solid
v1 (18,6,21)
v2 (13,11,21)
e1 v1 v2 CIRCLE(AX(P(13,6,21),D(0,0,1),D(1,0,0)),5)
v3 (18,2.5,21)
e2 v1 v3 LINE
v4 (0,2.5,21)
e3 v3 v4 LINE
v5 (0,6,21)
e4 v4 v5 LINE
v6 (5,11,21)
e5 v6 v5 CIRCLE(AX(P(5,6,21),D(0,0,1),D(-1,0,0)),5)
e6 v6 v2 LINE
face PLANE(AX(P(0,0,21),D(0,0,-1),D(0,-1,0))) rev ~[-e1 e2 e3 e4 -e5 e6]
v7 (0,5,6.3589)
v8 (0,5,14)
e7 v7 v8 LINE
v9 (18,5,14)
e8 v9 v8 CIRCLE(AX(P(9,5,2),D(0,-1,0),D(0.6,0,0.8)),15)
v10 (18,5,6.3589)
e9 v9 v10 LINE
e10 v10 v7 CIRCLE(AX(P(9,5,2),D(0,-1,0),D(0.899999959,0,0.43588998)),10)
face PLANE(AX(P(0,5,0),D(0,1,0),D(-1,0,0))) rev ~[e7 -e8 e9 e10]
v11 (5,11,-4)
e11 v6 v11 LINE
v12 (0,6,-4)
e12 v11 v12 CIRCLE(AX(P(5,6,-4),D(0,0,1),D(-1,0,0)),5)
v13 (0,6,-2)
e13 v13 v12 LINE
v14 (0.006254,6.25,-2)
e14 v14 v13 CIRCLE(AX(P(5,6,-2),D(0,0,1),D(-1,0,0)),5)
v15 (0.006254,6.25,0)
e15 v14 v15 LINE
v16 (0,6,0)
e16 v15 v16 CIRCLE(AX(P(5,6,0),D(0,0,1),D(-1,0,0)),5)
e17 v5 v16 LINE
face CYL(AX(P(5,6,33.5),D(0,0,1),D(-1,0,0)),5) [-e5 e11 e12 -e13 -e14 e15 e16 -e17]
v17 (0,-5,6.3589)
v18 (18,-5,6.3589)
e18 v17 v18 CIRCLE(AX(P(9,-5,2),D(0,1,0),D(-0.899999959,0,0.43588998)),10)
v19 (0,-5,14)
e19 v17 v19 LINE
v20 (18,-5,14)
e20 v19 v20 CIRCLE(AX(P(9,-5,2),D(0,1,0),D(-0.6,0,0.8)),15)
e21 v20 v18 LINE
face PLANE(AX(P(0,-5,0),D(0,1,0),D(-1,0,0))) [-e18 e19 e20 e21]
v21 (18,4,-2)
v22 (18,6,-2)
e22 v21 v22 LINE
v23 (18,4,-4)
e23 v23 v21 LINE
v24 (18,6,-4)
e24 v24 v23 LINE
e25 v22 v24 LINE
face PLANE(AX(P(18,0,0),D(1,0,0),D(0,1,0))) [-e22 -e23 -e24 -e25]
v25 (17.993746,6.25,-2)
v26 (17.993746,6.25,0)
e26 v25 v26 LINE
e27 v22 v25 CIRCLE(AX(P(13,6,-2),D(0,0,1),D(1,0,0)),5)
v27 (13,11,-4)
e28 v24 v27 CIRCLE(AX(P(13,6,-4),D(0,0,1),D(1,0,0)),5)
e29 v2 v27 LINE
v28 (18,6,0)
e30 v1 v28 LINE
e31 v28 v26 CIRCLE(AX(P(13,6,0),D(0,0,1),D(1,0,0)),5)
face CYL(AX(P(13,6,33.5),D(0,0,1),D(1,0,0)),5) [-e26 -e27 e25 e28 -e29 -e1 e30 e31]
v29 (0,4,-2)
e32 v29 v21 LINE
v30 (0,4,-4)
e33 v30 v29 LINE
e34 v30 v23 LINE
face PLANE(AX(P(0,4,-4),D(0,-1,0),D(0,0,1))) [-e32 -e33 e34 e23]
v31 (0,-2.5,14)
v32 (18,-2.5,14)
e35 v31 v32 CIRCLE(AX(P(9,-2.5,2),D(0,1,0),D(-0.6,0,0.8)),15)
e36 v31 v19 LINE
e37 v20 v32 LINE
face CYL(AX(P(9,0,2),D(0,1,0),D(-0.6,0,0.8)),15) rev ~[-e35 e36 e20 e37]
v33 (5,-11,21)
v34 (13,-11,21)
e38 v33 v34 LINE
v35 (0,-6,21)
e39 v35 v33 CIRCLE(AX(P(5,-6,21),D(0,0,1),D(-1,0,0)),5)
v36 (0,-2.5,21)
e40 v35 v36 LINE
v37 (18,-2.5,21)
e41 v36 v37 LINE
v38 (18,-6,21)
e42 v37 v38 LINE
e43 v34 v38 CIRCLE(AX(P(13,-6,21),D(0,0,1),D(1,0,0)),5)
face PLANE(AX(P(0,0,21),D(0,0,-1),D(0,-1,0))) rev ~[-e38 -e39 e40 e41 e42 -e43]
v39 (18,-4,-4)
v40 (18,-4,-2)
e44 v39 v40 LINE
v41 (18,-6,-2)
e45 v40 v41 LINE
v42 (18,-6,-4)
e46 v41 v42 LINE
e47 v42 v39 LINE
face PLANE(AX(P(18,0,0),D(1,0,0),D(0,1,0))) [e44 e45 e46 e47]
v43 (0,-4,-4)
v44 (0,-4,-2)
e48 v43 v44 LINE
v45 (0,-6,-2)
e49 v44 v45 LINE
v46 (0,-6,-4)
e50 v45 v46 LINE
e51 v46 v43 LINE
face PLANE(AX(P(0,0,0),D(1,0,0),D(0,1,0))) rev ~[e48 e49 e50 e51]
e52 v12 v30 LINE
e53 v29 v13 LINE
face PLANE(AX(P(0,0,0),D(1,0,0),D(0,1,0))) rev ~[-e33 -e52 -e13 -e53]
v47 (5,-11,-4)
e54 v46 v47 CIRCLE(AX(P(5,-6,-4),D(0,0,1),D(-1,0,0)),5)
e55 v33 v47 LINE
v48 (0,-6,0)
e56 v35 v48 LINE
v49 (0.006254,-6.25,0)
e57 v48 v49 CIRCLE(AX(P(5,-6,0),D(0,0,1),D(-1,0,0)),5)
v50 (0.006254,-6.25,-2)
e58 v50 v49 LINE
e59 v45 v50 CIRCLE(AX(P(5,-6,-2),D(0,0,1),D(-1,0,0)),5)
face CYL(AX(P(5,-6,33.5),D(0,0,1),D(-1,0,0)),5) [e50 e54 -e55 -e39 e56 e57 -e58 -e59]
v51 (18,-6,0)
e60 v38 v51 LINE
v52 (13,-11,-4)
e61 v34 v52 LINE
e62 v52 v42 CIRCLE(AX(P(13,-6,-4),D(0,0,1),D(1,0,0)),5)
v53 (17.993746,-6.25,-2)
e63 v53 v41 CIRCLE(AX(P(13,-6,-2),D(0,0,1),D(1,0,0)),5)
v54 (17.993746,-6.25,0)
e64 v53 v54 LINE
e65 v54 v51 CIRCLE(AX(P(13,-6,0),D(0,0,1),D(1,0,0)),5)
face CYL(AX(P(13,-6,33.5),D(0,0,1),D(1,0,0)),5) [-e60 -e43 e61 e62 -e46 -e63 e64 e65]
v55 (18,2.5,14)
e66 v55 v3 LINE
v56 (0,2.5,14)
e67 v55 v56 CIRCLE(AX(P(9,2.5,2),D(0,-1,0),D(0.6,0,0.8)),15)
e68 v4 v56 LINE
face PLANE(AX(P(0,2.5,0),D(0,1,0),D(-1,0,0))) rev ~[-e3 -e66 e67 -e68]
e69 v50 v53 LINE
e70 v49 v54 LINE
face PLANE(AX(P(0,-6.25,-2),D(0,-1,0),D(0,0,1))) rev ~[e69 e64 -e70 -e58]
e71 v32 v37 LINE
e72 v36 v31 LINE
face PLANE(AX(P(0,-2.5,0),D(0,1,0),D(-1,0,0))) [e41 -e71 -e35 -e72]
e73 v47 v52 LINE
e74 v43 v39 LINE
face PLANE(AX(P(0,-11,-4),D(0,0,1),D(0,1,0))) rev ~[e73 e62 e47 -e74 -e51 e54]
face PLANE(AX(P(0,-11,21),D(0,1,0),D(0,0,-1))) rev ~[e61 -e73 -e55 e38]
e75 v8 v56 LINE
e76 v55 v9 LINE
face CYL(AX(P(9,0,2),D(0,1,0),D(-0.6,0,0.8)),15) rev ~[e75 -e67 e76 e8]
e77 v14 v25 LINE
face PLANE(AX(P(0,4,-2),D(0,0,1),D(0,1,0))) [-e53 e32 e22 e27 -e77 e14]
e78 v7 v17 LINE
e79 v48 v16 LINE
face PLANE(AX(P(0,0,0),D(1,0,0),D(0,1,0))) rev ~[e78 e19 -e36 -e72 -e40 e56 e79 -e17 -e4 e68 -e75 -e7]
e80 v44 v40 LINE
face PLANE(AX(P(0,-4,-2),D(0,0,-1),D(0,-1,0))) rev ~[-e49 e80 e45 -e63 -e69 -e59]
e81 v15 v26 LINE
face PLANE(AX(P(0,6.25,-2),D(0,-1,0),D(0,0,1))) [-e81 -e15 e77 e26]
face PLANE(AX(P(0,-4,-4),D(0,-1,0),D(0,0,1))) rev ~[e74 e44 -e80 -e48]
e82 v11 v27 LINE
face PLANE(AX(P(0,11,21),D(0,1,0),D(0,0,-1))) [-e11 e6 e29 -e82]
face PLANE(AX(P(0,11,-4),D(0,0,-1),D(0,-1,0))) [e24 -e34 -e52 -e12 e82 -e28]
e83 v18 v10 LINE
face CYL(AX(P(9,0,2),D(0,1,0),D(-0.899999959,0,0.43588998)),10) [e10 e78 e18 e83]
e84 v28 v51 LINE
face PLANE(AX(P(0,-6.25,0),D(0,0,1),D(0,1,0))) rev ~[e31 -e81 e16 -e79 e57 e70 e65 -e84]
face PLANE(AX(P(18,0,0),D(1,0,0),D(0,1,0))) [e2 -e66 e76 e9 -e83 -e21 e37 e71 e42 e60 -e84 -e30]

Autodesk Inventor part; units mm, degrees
ref_plane "YZ Plane" through (0, 0, 0) normal (1, 0, 0) x (0, 1, 0)
ref_plane "XZ Plane" through (0, 0, 0) normal (0, 1, 0) x (-1, 0, 0)
sketch "Sketch1" plane through (0, 0, 0) normal (1, 0, 0) x (0, 1, 0)
  line L0 (0, -9) -> (0, 26) projected
  line L1 (0, 21) -> (-11, 21)
  line L2 (-11, 21) -> (-11, -4)
  line L3 (-11, -4) -> (-4, -4)
  line L4 (-4, -4) -> (-4, -2)
  line L5 (-4, -2) -> (-6.25, -2)
  line L6 (-6.25, -2) -> (-6.25, 0)
  line L7 (-6.25, 0) -> (0, 0)
  line L8 (0, 21) -> (11, 21)
  line L9 (11, 21) -> (11, -4)
  line L10 (11, -4) -> (4, -4)
  line L11 (4, -4) -> (4, -2)
  line L12 (4, -2) -> (6.25, -2)
  line L13 (6.25, -2) -> (6.25, 0)
  line L14 (6.25, 0) -> (0, 0)
  dimension "d1" = 22
  dimension "d2" = 25
  dimension "d3" = 12.5
  dimension "d4" = 8
  dimension "d5" = 4
  dimension "d6" = 2
extrude "Extrusion1" add sketch "Sketch1" along normal blind 18
fillet "Fillet1" radius 5 4 edges at (0, -11, 8.5) (18, -11, 8.5) (18, 11, 8.5) (0, 11, 8.5)
sketch "Sketch2" plane through (0, 0, 0) normal (0, 1, 0) x (-1, 0, 0)
  line L0 (-18, 0) -> (-18, 21) construction
  line L1 (-5, 21) -> (-13, 21) construction
  line L2 (-9, 21) -> (-9, -4)
  line L3 (0, -4) -> (-18, -4) construction
  line L4 (0, 0) -> (0, 0) construction
  arc A0 (0, 6.3589) -> (-18, 6.3589) centre (-9, 2) ccw
  arc A1 (0, 14) -> (-18, 14) centre (-9, 2) ccw
  line L5 (-18, 14) -> (-18, 6.3589)
  line L6 (0, 6.3589) -> (0, 14)
  line L7 (0, 14) -> (0, 6.3589)
  line L8 (-18, 14) -> (-18, 21)
  line L9 (-18, 21) -> (0, 21)
  line L10 (0, 21) -> (0, 14)
  dimension "d10" = 10
  dimension "d11" = 6
  dimension "d18" = 5
extrude "Extrusion2" cut sketch "Sketch2" against normal mid plane 10 contours A1 L6 A0 L2 | L2 A0 L5 A1
extrude "Extrusion3" cut sketch "Sketch2" against normal mid plane 5 contours L9 L10 A1 L2 | L2 A1 L8 L9
ref_plane "ULC_ULG" through (18, 0, 0) normal (1, 0, 0) x (0, 0, -1)
equation "\"d1\" = W_"
equation "\"d2\" = H_"
equation "\"d3\" = ULC_ULG_W1"
equation "\"d4\" = ULC_ULG_W2"
equation "\"d5\" = ULC_ULG_H1"
equation "\"d6\" = ULC_ULG_H2"
equation "\"d7\" = L"
equation "\"d9\" = ULC_a1"
equation "\"d10\" = R"
equation "\"d11\" = RC"
equation "\"d18\" = ULC_ULB_H"
equation "\"d19\" = ULC_ULB_Wmin"
equation "\"d23\" = ULC_ULB_W1"
equation "\"ULC_ULB_H\" = 5"
equation "\"W_\" = 22"
equation "\"L\" = 18"
equation "\"H_\" = 25"
equation "\"RC\" = 6"
equation "\"R\" = 10"
equation "\"ULC_ULB_Wmin\" = 10"
equation "\"ULC_ULB_W1\" = 5"
equation "\"ULC_ULG_W1\" = 12.5"
equation "\"ULC_ULG_W2\" = 8"
equation "\"ULC_ULG_H1\" = 4"
equation "\"ULC_ULG_H2\" = 2"
equation "\"ULC_a1\" = 5"
properties part number "\"ULC 1001\"" material "DIN 1.2344"
